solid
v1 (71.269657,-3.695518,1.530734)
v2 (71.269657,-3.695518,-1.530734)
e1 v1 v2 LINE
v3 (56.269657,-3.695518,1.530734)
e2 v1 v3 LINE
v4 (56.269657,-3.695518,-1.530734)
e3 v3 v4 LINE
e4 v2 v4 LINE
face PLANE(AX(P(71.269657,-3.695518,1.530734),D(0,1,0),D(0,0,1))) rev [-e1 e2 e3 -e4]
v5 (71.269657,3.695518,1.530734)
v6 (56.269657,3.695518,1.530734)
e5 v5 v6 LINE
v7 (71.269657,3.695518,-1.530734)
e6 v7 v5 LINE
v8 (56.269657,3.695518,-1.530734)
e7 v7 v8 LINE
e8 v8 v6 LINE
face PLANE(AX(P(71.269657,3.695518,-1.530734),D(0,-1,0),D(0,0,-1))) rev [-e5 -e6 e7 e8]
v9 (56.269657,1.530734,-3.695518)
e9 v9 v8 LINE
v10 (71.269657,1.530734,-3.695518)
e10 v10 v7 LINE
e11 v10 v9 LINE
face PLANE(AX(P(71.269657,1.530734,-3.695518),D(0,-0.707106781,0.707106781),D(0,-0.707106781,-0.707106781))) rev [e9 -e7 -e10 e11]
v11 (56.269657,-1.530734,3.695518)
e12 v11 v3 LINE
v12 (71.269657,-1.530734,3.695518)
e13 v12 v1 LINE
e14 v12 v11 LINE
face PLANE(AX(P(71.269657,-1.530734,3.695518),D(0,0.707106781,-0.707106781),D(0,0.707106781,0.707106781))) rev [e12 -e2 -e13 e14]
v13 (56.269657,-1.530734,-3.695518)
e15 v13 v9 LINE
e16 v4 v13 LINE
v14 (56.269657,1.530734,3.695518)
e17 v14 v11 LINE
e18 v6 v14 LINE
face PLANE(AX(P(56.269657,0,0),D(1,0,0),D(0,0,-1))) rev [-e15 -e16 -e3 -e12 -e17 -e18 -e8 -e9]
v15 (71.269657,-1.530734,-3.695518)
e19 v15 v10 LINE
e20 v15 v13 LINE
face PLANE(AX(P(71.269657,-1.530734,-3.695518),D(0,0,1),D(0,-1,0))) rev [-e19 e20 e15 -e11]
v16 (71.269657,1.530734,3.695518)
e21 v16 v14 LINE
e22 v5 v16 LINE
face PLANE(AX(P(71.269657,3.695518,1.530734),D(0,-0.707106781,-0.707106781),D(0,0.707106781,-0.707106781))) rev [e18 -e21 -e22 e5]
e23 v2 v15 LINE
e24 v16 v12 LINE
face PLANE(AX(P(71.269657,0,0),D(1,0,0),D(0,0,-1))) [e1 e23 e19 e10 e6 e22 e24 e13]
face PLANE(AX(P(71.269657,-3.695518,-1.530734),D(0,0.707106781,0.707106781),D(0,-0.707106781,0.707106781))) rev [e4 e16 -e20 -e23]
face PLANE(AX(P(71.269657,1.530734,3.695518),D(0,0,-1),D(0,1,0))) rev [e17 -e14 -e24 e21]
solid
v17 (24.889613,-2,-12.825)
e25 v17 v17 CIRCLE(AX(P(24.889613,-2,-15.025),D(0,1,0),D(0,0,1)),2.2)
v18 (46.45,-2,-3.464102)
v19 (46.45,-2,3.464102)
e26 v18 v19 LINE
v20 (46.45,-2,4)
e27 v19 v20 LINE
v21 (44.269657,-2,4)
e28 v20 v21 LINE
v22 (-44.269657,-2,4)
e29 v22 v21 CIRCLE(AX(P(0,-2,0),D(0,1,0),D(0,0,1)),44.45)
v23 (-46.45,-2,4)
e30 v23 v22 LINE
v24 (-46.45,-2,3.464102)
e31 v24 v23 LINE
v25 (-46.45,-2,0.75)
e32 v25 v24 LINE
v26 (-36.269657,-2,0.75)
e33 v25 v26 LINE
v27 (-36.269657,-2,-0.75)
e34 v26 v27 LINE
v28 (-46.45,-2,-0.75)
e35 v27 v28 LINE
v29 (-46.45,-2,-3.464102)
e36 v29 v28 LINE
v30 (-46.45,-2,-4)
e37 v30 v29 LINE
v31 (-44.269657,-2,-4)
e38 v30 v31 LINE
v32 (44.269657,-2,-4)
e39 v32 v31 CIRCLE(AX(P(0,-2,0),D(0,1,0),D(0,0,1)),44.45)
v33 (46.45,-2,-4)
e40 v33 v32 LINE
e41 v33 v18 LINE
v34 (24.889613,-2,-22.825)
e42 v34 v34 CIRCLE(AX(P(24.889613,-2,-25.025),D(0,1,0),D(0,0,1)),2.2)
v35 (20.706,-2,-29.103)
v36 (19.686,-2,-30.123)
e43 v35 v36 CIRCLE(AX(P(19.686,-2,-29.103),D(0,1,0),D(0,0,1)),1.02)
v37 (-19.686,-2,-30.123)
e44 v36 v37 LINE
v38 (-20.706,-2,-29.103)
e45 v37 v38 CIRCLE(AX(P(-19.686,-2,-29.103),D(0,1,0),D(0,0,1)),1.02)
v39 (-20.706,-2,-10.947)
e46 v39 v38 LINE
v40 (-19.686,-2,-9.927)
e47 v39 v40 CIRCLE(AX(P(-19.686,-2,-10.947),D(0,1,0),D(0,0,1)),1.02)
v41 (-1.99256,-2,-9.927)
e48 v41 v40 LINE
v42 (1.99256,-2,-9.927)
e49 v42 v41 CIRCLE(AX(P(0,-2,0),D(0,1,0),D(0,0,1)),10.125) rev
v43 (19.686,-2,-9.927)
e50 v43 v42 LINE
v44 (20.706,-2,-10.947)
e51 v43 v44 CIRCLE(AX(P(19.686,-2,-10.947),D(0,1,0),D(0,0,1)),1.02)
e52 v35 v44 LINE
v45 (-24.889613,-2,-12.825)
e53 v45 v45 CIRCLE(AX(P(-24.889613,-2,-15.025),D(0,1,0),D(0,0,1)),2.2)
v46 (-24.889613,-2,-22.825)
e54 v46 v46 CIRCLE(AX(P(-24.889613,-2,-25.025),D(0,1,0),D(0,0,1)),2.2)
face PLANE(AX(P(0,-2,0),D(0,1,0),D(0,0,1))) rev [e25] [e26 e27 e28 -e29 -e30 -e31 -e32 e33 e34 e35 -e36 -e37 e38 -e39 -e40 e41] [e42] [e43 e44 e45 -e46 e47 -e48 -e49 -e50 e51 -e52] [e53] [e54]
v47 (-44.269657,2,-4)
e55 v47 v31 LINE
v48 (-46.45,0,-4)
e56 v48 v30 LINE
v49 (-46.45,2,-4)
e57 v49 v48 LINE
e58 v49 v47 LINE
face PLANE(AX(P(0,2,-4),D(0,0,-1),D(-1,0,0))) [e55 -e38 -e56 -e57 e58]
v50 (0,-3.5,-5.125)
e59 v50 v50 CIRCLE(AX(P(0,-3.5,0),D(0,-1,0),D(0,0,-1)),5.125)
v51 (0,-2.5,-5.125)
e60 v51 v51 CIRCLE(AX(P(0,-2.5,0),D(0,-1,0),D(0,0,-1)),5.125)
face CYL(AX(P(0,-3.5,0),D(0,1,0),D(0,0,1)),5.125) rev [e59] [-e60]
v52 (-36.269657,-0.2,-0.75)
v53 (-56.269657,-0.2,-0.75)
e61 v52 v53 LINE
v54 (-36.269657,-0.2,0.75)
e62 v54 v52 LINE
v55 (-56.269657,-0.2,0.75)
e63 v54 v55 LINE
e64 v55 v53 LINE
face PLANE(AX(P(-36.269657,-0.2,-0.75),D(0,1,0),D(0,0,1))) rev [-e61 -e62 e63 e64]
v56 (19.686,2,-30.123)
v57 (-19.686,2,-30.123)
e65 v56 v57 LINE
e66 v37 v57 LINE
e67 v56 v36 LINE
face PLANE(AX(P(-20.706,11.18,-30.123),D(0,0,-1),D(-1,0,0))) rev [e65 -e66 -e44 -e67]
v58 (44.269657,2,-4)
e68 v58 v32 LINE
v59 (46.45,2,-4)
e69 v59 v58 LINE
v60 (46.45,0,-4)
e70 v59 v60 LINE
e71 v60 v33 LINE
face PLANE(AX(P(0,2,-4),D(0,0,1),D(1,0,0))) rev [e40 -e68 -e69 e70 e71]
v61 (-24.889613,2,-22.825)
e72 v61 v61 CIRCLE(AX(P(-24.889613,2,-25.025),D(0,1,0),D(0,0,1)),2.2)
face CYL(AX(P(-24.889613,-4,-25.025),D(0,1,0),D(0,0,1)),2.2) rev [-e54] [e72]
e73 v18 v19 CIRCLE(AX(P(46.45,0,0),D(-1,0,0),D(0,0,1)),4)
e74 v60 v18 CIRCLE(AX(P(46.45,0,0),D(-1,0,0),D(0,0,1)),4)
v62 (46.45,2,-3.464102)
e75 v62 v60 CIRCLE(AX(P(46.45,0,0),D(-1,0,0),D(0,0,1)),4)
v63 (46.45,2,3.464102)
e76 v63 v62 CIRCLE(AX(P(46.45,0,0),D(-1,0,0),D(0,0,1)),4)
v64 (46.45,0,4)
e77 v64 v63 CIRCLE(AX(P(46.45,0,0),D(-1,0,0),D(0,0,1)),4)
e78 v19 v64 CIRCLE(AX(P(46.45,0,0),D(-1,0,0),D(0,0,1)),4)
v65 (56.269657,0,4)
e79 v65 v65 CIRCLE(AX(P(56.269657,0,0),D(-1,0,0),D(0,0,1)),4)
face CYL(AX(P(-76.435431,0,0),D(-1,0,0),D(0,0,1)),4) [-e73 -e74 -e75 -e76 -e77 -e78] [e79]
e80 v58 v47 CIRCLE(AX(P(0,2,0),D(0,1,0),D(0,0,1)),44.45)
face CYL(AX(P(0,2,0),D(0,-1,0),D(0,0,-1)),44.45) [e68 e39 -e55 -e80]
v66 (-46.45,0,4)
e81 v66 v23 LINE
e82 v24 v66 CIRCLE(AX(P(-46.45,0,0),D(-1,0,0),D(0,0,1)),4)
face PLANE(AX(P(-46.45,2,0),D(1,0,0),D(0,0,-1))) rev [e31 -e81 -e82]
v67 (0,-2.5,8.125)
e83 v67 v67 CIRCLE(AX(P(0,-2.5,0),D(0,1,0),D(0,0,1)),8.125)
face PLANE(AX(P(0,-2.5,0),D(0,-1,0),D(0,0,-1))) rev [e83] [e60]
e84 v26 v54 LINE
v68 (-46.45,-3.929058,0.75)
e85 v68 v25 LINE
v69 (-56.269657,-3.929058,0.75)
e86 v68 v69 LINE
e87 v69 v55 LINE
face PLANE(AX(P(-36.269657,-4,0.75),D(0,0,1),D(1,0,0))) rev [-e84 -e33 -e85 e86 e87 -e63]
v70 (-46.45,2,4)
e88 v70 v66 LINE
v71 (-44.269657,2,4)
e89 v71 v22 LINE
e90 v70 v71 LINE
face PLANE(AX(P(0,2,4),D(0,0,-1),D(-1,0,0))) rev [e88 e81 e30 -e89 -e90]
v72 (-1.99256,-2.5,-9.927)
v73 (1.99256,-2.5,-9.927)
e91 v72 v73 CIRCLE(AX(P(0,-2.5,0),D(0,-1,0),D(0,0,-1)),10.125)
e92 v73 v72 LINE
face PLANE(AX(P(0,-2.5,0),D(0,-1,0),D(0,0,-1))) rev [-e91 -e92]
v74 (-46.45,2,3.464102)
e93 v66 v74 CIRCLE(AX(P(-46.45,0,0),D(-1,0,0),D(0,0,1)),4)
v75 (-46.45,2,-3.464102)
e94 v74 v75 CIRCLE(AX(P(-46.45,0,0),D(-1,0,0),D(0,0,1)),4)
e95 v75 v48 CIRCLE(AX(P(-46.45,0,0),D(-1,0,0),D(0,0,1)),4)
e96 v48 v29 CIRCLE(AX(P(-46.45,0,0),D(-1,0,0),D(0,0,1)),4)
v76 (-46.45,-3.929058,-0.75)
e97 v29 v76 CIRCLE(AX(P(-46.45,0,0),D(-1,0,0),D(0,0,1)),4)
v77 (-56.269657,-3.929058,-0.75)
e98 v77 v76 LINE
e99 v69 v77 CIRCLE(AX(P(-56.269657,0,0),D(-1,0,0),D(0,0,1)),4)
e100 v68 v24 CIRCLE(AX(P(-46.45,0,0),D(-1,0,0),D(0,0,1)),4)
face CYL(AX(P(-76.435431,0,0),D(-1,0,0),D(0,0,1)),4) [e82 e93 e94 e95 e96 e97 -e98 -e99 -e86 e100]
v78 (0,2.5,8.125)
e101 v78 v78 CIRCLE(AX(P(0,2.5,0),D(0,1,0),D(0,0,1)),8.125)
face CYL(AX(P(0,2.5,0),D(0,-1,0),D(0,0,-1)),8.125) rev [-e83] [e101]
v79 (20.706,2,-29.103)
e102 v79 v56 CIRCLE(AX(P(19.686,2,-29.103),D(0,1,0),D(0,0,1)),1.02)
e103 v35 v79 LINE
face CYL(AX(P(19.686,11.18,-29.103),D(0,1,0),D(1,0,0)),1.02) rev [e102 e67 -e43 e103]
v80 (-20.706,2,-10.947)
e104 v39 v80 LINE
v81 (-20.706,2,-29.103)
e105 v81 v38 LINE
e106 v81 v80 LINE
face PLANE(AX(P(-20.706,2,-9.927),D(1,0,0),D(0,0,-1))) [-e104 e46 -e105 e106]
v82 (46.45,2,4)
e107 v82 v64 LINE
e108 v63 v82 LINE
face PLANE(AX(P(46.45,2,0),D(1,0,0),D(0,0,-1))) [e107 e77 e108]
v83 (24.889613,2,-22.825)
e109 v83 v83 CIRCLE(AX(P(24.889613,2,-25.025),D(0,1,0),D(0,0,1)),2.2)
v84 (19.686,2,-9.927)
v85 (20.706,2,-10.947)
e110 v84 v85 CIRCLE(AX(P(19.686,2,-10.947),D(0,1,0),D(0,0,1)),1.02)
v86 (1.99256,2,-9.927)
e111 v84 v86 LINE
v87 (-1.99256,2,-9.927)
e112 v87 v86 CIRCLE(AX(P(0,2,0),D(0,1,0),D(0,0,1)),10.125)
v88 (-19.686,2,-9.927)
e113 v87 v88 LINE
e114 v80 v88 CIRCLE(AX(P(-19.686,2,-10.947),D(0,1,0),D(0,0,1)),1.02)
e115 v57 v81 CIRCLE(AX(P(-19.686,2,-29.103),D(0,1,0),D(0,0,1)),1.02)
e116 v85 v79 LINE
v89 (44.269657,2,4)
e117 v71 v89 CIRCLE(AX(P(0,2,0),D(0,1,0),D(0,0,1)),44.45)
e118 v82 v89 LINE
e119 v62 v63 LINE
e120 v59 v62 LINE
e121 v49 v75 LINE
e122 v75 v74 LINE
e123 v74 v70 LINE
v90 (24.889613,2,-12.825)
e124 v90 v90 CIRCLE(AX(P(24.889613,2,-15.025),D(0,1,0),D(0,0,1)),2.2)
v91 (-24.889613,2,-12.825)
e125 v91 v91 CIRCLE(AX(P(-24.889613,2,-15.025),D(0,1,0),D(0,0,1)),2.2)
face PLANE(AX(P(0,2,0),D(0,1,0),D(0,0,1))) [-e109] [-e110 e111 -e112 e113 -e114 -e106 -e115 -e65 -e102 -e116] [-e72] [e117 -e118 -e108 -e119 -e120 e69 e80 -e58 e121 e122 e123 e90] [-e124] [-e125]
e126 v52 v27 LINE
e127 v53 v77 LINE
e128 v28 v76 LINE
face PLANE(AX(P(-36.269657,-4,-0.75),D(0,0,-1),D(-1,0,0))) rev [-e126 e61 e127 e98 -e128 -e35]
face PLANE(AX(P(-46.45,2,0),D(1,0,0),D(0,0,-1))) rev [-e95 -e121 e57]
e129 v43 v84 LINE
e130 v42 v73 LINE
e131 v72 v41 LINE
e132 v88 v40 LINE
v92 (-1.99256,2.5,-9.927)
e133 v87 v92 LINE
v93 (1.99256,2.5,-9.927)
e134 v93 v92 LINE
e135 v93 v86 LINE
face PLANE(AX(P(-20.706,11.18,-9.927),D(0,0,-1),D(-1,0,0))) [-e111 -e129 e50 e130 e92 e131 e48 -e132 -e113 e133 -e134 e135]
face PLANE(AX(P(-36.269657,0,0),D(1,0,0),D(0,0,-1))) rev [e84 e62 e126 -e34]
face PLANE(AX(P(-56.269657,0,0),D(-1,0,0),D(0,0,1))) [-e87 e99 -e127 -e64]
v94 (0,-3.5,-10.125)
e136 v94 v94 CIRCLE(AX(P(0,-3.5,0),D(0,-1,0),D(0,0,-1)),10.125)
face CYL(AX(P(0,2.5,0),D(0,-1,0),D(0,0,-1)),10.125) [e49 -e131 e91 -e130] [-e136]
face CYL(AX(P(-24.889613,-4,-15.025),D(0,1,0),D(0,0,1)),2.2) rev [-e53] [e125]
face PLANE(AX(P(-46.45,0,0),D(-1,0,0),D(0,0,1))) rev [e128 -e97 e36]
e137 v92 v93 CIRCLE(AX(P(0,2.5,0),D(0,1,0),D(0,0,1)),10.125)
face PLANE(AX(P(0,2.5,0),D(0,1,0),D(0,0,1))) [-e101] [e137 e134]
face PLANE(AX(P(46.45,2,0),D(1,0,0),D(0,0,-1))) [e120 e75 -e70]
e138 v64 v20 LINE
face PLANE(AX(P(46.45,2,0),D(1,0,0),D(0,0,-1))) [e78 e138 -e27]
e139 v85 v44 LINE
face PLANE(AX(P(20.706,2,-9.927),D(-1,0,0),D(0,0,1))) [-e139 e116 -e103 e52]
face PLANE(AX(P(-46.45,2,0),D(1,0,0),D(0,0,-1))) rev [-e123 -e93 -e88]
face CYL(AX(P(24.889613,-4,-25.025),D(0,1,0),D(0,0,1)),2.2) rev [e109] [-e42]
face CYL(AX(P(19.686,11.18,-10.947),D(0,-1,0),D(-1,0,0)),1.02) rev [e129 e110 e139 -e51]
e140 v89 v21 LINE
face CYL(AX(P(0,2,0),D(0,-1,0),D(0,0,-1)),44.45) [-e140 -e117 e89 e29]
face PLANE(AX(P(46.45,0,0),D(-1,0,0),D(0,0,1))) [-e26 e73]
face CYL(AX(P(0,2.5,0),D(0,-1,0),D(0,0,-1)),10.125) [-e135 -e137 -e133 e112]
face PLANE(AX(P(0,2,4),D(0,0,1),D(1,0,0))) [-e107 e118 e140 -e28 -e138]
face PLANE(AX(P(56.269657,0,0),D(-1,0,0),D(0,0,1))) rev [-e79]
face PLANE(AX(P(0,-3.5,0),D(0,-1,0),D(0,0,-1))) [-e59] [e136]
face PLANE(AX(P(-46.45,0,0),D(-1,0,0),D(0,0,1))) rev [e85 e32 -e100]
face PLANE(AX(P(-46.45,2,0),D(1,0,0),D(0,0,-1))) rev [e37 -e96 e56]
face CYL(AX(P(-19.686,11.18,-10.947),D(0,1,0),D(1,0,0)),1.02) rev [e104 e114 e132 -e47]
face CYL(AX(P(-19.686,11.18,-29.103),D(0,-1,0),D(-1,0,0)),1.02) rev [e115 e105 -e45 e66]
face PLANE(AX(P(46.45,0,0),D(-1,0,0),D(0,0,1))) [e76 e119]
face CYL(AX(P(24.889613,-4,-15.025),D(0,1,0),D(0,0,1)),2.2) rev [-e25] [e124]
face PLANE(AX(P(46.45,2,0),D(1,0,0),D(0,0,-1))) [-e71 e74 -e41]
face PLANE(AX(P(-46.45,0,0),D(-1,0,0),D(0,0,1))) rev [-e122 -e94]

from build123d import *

# Parameters (mm, degrees)
SKETCH1_R           = 10.125
BOSS_EXTRUDE1_DEPTH = 2
SKETCH1_6_W         = 9.819656651
SKETCH1_6_H         = 4
SKETCH1_7_R         = 10.125
SKETCH1_7_R_2       = 8.125
BOSS_EXTRUDE2_DEPTH = 2.5
CAVITY1_START       = -2.5
CAVITY1_DEPTH       = 5
SKETCH3_R           = 2.2
CUT_EXTRUDE1_DEPTH  = 72.95885463
SKETCH4_W           = 1.5
SKETCH4_H           = 3.8
CUT_EXTRUDE2_DEPTH  = 20
BOSS_EXTRUDE3_DEPTH = 15
SKETCH6_R           = 10.125
SKETCH6_R_2         = 5.125
BOSS_EXTRUDE4_DEPTH = 1


# Read off the part's stored shape, not the designer's step: Cavity1
with BuildPart() as part:
    # Sketch1 → Boss-Extrude1 (new, symmetric)
    with BuildSketch(Plane(origin=(0, 0, 0), x_dir=(1, 0, 0), z_dir=(0, 1, 0))):
        with BuildLine():
            Line((-44.269656651, 4), (-46.45, 4))
            Line((-46.45, 4), (-46.45, -4))
            Line((-46.45, -4), (-44.269656651, -4))
            ThreePointArc((-44.269656651, -4), (0, -44.45), (44.269656651, -4))
            Line((44.269656651, -4), (46.45, -4))
            Line((46.45, -4), (46.45, 4))
            Line((46.45, 4), (44.269656651, 4))
            ThreePointArc((44.269656651, 4), (0, 44.45), (-44.269656651, 4))
        make_face()
        with Locations(Location((0, 0, 0), (0, 0, 270))):
            Circle(SKETCH1_R, mode=Mode.SUBTRACT)
    extrude(amount=BOSS_EXTRUDE1_DEPTH, both=True)

    # Sketch1<6> → Revolve1 (revolve)
    with BuildSketch(Plane(origin=(0, 0, 0), x_dir=(1, 0, 0), z_dir=(0, 1, 0))):
        with Locations((-51.359828326, -2)):
            Rectangle(SKETCH1_6_W, SKETCH1_6_H)
        with Locations((51.359828326, -2)):
            Rectangle(SKETCH1_6_W, SKETCH1_6_H)
    revolve(axis=Axis((-76.43543075, 0, 0), (1, 0, 0)))

    # Sketch1<7> → Boss-Extrude2 (add, symmetric)
    with BuildSketch(Plane(origin=(0, 0, 0), x_dir=(1, 0, 0), z_dir=(0, 1, 0))):
        with Locations(Location((0, 0, 0), (0, 0, 270))):
            Circle(SKETCH1_7_R)
        with Locations(Location((0, 0, 0), (0, 0, 270))):
            Circle(SKETCH1_7_R_2, mode=Mode.SUBTRACT)
    extrude(amount=BOSS_EXTRUDE2_DEPTH, both=True)

    # Cavity1 outline → Cavity1 (cut)
    with BuildSketch(Plane(origin=(0, 0, 0), x_dir=(1, 0, 0), z_dir=(0, 1, 0)).offset(CAVITY1_START)):
        with BuildLine():
            Line((20.706, 10.947), (20.706, 29.103))
            ThreePointArc((20.706, 29.103), (20.407248917, 29.824248917), (19.686, 30.123))
            Line((19.686, 30.123), (-19.686, 30.123))
            ThreePointArc((-19.686, 30.123), (-20.407248917, 29.824248917), (-20.706, 29.103))
            Line((-20.706, 29.103), (-20.706, 10.947))
            ThreePointArc((-20.706, 10.947), (-20.407248917, 10.225751083), (-19.686, 9.927))
            Line((-19.686, 9.927), (19.686, 9.927))
            ThreePointArc((19.686, 9.927), (20.407248917, 10.225751083), (20.706, 10.947))
        make_face()
    extrude(amount=CAVITY1_DEPTH, mode=Mode.SUBTRACT)

    # Sketch3 → Cut-Extrude1 (cut, through all)
    with BuildSketch(Plane(origin=(0, 2, 0), x_dir=(1, 0, 0), z_dir=(0, 1, 0))):
        with Locations(Location((-24.889613301, 25.025, 0), (0, 0, 270))):
            Circle(SKETCH3_R)
        with Locations(Location((-24.889613301, 15.025, 0), (0, 0, 270))):
            Circle(SKETCH3_R)
        with Locations(Location((24.889613301, 15.025, 0), (0, 0, 270))):
            Circle(SKETCH3_R)
        with Locations(Location((24.889613301, 25.025, 0), (0, 0, 270))):
            Circle(SKETCH3_R)
    extrude(amount=-CUT_EXTRUDE1_DEPTH, mode=Mode.SUBTRACT)

    # Sketch4 → Cut-Extrude2 (cut)
    with BuildSketch(Plane.ZY.offset(56.269656651)):
        with Locations((0, -2.1)):
            Rectangle(SKETCH4_W, SKETCH4_H)
    extrude(amount=-CUT_EXTRUDE2_DEPTH, mode=Mode.SUBTRACT)

    # Sketch6 → Boss-Extrude4 (add)
    with BuildSketch(Plane.XZ.offset(2.5)):
        with Locations(Location((0, 0, 0), (0, 0, 270))):
            Circle(SKETCH6_R)
        with Locations(Location((0, 0, 0), (0, 0, 270))):
            Circle(SKETCH6_R_2, mode=Mode.SUBTRACT)
    extrude(amount=BOSS_EXTRUDE4_DEPTH)


with BuildPart() as body_2:
    # Sketch5 → Boss-Extrude3 (new body)
    with BuildSketch(Plane(origin=(56.269656651, 0, 0), x_dir=(0, 0, -1), z_dir=(1, 0, 0))):
        Polygon((3.69551813, 1.530733729), (1.530733729, 3.69551813), (-1.530733729, 3.69551813), (-3.69551813, 1.530733729), (-3.69551813, -1.530733729), (-1.530733729, -3.69551813), (1.530733729, -3.69551813), (3.69551813, -1.530733729), align=None)
    extrude(amount=BOSS_EXTRUDE3_DEPTH)


solid = Compound([part.part, body_2.part])
